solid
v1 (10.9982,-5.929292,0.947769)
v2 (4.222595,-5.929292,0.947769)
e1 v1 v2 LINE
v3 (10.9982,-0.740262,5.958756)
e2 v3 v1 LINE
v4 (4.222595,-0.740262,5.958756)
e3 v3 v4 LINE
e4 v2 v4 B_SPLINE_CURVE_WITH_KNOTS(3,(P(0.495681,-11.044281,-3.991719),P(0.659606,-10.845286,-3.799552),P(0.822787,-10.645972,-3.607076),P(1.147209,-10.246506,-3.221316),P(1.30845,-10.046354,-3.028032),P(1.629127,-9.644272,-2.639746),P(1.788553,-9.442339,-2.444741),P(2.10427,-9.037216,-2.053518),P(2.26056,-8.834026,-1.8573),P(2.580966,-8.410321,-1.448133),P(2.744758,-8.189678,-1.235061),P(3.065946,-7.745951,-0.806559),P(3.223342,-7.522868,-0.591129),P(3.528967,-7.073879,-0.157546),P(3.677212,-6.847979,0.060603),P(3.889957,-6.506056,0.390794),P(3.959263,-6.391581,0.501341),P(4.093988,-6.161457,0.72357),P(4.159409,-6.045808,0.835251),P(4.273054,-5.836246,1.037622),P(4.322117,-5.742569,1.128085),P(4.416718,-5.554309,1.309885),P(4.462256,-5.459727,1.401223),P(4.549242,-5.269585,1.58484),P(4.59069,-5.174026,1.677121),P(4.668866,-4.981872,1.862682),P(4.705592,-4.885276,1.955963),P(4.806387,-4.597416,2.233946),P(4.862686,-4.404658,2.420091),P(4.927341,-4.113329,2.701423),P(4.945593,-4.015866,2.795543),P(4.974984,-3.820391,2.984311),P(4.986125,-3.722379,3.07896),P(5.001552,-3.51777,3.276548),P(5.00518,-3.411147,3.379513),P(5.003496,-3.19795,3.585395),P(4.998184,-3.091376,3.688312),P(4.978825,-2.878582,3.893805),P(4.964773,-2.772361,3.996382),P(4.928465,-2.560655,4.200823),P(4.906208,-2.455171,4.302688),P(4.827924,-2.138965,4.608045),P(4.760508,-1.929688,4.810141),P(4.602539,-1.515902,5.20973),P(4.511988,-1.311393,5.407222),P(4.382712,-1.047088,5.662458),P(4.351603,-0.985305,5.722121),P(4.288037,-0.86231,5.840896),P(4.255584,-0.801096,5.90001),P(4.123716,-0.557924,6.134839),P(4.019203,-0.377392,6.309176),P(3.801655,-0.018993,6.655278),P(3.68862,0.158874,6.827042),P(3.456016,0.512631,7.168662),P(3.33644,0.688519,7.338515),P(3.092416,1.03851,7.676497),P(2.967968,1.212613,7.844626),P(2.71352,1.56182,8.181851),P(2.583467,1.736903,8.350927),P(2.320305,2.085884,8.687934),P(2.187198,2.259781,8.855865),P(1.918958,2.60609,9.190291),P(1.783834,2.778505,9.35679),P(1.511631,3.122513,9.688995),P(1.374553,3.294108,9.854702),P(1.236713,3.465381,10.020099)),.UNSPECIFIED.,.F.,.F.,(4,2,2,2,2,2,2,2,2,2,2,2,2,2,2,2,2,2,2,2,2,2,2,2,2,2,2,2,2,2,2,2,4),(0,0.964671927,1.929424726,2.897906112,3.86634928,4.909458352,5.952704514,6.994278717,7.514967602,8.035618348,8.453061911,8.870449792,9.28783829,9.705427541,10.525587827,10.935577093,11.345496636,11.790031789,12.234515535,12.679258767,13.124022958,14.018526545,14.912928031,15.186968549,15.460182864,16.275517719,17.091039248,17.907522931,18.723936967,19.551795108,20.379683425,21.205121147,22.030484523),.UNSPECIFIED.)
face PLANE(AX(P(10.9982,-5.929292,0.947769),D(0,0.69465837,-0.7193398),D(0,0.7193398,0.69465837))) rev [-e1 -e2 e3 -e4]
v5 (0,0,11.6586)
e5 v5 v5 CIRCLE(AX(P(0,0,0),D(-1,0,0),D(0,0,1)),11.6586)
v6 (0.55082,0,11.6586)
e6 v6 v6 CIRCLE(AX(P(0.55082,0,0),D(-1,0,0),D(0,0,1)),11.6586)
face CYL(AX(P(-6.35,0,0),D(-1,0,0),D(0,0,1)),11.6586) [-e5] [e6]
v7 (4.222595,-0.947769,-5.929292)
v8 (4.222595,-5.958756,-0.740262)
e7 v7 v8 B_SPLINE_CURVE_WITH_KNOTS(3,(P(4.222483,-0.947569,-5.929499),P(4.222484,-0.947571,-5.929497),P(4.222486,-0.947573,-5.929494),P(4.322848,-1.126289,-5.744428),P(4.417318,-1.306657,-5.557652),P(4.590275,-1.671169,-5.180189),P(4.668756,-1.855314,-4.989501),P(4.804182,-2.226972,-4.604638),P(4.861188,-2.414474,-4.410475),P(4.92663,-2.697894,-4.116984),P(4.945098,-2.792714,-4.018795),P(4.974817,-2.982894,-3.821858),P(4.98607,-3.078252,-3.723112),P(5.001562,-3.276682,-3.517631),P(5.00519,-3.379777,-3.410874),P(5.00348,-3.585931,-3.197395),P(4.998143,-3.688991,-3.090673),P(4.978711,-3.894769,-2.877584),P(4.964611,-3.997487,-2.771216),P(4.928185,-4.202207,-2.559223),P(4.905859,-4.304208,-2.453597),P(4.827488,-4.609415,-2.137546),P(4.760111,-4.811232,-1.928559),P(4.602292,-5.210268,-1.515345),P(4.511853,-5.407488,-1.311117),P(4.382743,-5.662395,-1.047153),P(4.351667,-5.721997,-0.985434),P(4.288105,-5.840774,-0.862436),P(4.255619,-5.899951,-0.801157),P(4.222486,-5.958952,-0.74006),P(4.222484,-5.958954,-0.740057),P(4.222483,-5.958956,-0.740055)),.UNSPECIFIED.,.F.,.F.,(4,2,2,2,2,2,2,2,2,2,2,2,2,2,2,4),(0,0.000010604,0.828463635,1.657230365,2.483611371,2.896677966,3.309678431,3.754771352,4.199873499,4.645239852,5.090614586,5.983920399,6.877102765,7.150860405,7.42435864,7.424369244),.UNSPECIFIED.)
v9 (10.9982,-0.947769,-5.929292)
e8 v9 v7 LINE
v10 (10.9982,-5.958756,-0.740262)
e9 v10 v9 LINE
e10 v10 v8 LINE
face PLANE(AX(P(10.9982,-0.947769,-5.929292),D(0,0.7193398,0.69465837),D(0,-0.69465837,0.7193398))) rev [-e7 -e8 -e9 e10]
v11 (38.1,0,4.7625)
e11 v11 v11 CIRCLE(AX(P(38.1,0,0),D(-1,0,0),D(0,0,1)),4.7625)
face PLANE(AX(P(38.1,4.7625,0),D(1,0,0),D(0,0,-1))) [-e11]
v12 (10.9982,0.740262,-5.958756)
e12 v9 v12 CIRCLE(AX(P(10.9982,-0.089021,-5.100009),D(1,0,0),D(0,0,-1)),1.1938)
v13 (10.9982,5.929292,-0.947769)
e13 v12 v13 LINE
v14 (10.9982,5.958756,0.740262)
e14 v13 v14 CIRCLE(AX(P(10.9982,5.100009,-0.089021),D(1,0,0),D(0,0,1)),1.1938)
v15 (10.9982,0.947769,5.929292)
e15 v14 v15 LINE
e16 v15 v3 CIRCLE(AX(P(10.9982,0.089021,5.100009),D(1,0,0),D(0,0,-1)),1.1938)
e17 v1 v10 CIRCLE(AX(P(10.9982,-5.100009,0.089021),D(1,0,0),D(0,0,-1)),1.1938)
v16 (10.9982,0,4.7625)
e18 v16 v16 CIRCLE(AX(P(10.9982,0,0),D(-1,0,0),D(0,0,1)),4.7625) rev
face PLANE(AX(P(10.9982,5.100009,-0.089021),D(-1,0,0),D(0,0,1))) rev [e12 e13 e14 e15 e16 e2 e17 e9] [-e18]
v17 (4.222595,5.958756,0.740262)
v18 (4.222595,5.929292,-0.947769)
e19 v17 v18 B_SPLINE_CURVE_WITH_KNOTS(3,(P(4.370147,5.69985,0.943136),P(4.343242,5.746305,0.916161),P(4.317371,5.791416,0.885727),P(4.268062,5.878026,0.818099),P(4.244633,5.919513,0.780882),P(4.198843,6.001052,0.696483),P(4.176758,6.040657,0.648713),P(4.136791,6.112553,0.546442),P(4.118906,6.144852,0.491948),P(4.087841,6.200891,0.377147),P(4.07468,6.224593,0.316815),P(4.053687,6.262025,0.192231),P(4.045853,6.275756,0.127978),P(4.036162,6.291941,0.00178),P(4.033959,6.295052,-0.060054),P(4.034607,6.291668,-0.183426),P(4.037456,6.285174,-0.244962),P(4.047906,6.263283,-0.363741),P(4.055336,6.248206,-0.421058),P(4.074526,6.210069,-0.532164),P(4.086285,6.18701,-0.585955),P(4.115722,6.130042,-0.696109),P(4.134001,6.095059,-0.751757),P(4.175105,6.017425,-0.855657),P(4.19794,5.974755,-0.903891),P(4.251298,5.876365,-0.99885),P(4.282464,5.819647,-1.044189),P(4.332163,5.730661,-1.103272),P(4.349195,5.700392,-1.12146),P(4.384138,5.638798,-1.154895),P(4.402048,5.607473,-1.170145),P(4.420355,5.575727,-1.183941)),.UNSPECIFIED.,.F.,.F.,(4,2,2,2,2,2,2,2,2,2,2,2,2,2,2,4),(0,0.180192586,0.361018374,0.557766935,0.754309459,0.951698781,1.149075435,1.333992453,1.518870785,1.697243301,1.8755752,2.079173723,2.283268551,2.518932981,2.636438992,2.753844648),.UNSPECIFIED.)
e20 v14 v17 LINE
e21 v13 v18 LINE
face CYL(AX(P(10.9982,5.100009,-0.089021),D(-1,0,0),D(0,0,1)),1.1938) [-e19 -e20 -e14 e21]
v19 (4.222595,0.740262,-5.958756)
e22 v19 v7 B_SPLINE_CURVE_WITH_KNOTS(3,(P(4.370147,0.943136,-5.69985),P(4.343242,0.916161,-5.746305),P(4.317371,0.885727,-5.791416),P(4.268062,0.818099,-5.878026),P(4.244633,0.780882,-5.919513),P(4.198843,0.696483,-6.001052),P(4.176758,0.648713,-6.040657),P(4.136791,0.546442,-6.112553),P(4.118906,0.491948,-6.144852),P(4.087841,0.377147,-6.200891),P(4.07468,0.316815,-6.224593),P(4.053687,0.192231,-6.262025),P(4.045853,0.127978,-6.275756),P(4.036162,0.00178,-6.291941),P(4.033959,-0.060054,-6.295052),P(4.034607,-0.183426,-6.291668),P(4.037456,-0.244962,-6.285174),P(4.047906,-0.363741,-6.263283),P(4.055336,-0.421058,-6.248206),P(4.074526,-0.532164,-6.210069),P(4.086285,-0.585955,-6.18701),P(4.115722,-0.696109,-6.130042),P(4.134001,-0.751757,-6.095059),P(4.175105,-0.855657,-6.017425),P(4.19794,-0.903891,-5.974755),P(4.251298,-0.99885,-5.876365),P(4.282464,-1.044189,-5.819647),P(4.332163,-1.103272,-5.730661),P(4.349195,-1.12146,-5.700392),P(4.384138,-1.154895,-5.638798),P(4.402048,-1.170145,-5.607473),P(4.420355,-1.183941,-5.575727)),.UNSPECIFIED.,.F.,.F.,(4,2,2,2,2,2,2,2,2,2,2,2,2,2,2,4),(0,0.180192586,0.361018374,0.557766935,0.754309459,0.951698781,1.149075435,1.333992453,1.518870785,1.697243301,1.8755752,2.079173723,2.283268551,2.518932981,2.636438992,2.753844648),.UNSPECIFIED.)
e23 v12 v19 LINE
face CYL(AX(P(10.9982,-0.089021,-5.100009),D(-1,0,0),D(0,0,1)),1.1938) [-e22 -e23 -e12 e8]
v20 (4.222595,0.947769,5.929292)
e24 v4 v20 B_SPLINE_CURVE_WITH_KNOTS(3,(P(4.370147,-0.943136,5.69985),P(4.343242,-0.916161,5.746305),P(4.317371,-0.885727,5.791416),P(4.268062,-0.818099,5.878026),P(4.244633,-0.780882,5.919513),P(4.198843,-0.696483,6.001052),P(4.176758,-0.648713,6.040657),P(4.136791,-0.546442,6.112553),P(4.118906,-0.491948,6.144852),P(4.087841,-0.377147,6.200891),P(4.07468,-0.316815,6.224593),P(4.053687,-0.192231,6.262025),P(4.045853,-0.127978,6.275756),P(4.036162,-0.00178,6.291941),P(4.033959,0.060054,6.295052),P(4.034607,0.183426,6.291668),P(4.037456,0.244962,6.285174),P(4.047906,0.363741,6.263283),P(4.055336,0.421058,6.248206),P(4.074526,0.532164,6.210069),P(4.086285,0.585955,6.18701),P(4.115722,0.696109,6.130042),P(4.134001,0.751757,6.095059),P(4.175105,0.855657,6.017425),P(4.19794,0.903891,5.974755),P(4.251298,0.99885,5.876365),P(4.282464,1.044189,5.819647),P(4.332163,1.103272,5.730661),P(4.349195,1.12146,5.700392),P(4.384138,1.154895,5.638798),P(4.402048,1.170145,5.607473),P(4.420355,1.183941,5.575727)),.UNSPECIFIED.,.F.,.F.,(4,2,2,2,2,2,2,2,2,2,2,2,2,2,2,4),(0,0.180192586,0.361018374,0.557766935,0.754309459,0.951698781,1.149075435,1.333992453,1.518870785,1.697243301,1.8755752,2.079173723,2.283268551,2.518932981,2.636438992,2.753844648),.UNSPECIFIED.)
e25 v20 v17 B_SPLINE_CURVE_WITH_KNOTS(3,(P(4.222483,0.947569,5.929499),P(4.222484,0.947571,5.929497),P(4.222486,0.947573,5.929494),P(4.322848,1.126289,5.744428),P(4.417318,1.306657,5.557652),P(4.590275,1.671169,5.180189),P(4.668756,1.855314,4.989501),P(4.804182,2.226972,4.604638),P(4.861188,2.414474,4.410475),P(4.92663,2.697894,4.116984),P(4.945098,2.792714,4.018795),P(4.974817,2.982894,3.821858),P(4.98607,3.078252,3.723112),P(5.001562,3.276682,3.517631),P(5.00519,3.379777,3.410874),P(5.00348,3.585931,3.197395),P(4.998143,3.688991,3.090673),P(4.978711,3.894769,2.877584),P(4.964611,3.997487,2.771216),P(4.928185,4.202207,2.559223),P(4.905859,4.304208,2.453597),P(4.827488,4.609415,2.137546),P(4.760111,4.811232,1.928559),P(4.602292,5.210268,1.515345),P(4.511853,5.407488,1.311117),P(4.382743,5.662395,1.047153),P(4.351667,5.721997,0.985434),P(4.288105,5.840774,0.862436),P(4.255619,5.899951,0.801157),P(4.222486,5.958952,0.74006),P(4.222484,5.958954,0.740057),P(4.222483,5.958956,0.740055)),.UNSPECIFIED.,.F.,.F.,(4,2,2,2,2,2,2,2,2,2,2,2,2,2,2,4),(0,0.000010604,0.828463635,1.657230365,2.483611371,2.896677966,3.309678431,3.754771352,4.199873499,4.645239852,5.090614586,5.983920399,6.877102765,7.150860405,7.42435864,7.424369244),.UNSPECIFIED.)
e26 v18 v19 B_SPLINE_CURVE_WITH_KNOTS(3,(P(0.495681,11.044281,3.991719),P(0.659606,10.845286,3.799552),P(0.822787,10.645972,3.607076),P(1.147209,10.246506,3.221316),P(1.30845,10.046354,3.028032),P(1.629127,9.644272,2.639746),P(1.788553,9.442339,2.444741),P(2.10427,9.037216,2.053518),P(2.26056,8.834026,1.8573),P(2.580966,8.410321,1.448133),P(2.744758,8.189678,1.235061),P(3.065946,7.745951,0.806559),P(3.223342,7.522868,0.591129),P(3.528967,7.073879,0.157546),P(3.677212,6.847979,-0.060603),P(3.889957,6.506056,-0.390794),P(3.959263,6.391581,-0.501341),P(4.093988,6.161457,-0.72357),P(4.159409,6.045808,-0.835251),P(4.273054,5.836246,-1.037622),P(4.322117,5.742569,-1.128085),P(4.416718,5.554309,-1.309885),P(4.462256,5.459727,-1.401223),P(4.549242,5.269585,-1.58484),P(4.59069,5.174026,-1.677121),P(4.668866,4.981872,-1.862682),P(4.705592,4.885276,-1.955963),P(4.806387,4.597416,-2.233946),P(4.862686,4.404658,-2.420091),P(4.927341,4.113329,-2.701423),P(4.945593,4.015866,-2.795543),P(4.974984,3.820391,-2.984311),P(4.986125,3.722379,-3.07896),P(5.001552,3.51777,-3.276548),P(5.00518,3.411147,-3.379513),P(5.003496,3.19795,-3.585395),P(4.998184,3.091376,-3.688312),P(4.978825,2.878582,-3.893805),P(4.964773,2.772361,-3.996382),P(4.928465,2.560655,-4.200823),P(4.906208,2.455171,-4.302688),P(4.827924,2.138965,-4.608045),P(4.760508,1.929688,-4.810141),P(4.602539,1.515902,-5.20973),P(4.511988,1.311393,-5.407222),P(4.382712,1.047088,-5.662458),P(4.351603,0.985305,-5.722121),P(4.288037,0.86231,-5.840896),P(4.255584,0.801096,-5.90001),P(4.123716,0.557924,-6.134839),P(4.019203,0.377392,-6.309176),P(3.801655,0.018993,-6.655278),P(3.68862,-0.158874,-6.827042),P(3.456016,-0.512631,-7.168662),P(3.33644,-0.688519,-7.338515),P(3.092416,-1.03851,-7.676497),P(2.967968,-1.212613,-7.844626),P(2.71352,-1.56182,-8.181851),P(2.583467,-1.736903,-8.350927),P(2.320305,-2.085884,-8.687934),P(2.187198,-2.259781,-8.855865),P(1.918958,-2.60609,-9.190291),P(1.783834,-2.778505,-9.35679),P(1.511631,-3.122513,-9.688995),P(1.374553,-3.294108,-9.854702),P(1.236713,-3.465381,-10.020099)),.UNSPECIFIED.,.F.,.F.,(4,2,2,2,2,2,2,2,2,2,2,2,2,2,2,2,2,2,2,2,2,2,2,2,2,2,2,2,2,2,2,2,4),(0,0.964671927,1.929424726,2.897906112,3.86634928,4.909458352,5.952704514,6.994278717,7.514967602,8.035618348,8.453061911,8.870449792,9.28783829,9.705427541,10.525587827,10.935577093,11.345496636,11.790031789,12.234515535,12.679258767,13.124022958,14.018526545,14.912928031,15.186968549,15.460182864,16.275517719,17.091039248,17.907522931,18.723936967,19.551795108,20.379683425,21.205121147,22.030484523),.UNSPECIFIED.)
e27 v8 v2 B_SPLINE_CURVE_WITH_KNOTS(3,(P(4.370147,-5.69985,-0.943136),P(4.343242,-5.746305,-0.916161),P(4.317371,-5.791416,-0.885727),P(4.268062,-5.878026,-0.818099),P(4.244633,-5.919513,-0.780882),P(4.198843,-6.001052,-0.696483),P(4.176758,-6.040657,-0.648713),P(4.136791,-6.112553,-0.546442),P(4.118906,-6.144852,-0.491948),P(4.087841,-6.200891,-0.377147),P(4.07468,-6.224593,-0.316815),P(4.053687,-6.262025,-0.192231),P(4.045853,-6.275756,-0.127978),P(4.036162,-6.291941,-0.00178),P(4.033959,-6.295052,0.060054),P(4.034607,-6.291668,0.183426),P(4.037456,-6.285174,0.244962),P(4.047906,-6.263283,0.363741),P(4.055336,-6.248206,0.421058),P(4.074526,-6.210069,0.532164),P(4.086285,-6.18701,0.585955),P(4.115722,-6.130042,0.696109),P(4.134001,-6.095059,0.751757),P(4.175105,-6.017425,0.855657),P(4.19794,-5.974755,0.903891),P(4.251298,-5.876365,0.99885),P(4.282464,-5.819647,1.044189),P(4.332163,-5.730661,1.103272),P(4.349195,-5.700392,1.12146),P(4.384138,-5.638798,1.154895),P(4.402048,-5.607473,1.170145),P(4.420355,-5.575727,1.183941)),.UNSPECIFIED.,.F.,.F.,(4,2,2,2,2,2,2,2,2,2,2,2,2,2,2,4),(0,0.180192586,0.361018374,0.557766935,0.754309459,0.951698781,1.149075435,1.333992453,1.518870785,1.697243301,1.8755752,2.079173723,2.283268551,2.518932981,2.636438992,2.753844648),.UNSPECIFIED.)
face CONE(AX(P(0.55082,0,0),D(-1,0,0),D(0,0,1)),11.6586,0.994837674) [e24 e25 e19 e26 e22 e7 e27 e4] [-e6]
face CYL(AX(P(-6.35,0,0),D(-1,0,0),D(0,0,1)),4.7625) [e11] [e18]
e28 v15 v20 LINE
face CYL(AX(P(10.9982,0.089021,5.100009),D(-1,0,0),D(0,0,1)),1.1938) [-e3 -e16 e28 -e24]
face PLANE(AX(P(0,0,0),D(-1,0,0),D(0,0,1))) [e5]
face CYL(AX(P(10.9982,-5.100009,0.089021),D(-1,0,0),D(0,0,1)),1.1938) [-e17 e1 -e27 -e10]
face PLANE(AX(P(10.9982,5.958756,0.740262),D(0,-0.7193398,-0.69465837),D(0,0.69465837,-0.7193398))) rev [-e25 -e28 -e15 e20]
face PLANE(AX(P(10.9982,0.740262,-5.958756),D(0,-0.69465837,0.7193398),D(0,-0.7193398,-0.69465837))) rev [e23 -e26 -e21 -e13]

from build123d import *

# Parameters (mm, degrees)
NECK_DEPTH = 10.9982


# Read off the part's stored shape, not the designer's step: Cut-Revolve1
with BuildPart() as part:
    # Cut-Revolve1 outline → Cut-Revolve1 (revolve)
    with BuildSketch(Plane.YX):
        Polygon((0, 38.1), (0, 0), (11.6586, 0), (11.6586, 0.550820297), (4.7625, 5.0292), (4.7625, 38.1), align=None)
    revolve(axis=Axis((0, 0, 0), (1, 0, 0)))

    # Sketch2 → Neck (add)
    with BuildSketch(Plane(origin=(0, 0, 0), x_dir=(0, 0.6946583704589985, -0.7193398003386501), z_dir=(1, 0, 0))):
        with BuildLine():
            Line((3.6068, -4.8006), (-3.6068, -4.8006))
            ThreePointArc((-3.6068, -4.8006), (-4.450944075, -4.450944075), (-4.8006, -3.6068))
            Line((-4.8006, -3.6068), (-4.8006, 3.6068))
            ThreePointArc((-4.8006, 3.6068), (-4.450944075, 4.450944075), (-3.6068, 4.8006))
            Line((-3.6068, 4.8006), (3.6068, 4.8006))
            ThreePointArc((3.6068, 4.8006), (4.450944075, 4.450944075), (4.8006, 3.6068))
            Line((4.8006, 3.6068), (4.8006, -3.6068))
            ThreePointArc((4.8006, -3.6068), (4.450944075, -4.450944075), (3.6068, -4.8006))
        make_face()
    extrude(amount=NECK_DEPTH)


solid = part.part
